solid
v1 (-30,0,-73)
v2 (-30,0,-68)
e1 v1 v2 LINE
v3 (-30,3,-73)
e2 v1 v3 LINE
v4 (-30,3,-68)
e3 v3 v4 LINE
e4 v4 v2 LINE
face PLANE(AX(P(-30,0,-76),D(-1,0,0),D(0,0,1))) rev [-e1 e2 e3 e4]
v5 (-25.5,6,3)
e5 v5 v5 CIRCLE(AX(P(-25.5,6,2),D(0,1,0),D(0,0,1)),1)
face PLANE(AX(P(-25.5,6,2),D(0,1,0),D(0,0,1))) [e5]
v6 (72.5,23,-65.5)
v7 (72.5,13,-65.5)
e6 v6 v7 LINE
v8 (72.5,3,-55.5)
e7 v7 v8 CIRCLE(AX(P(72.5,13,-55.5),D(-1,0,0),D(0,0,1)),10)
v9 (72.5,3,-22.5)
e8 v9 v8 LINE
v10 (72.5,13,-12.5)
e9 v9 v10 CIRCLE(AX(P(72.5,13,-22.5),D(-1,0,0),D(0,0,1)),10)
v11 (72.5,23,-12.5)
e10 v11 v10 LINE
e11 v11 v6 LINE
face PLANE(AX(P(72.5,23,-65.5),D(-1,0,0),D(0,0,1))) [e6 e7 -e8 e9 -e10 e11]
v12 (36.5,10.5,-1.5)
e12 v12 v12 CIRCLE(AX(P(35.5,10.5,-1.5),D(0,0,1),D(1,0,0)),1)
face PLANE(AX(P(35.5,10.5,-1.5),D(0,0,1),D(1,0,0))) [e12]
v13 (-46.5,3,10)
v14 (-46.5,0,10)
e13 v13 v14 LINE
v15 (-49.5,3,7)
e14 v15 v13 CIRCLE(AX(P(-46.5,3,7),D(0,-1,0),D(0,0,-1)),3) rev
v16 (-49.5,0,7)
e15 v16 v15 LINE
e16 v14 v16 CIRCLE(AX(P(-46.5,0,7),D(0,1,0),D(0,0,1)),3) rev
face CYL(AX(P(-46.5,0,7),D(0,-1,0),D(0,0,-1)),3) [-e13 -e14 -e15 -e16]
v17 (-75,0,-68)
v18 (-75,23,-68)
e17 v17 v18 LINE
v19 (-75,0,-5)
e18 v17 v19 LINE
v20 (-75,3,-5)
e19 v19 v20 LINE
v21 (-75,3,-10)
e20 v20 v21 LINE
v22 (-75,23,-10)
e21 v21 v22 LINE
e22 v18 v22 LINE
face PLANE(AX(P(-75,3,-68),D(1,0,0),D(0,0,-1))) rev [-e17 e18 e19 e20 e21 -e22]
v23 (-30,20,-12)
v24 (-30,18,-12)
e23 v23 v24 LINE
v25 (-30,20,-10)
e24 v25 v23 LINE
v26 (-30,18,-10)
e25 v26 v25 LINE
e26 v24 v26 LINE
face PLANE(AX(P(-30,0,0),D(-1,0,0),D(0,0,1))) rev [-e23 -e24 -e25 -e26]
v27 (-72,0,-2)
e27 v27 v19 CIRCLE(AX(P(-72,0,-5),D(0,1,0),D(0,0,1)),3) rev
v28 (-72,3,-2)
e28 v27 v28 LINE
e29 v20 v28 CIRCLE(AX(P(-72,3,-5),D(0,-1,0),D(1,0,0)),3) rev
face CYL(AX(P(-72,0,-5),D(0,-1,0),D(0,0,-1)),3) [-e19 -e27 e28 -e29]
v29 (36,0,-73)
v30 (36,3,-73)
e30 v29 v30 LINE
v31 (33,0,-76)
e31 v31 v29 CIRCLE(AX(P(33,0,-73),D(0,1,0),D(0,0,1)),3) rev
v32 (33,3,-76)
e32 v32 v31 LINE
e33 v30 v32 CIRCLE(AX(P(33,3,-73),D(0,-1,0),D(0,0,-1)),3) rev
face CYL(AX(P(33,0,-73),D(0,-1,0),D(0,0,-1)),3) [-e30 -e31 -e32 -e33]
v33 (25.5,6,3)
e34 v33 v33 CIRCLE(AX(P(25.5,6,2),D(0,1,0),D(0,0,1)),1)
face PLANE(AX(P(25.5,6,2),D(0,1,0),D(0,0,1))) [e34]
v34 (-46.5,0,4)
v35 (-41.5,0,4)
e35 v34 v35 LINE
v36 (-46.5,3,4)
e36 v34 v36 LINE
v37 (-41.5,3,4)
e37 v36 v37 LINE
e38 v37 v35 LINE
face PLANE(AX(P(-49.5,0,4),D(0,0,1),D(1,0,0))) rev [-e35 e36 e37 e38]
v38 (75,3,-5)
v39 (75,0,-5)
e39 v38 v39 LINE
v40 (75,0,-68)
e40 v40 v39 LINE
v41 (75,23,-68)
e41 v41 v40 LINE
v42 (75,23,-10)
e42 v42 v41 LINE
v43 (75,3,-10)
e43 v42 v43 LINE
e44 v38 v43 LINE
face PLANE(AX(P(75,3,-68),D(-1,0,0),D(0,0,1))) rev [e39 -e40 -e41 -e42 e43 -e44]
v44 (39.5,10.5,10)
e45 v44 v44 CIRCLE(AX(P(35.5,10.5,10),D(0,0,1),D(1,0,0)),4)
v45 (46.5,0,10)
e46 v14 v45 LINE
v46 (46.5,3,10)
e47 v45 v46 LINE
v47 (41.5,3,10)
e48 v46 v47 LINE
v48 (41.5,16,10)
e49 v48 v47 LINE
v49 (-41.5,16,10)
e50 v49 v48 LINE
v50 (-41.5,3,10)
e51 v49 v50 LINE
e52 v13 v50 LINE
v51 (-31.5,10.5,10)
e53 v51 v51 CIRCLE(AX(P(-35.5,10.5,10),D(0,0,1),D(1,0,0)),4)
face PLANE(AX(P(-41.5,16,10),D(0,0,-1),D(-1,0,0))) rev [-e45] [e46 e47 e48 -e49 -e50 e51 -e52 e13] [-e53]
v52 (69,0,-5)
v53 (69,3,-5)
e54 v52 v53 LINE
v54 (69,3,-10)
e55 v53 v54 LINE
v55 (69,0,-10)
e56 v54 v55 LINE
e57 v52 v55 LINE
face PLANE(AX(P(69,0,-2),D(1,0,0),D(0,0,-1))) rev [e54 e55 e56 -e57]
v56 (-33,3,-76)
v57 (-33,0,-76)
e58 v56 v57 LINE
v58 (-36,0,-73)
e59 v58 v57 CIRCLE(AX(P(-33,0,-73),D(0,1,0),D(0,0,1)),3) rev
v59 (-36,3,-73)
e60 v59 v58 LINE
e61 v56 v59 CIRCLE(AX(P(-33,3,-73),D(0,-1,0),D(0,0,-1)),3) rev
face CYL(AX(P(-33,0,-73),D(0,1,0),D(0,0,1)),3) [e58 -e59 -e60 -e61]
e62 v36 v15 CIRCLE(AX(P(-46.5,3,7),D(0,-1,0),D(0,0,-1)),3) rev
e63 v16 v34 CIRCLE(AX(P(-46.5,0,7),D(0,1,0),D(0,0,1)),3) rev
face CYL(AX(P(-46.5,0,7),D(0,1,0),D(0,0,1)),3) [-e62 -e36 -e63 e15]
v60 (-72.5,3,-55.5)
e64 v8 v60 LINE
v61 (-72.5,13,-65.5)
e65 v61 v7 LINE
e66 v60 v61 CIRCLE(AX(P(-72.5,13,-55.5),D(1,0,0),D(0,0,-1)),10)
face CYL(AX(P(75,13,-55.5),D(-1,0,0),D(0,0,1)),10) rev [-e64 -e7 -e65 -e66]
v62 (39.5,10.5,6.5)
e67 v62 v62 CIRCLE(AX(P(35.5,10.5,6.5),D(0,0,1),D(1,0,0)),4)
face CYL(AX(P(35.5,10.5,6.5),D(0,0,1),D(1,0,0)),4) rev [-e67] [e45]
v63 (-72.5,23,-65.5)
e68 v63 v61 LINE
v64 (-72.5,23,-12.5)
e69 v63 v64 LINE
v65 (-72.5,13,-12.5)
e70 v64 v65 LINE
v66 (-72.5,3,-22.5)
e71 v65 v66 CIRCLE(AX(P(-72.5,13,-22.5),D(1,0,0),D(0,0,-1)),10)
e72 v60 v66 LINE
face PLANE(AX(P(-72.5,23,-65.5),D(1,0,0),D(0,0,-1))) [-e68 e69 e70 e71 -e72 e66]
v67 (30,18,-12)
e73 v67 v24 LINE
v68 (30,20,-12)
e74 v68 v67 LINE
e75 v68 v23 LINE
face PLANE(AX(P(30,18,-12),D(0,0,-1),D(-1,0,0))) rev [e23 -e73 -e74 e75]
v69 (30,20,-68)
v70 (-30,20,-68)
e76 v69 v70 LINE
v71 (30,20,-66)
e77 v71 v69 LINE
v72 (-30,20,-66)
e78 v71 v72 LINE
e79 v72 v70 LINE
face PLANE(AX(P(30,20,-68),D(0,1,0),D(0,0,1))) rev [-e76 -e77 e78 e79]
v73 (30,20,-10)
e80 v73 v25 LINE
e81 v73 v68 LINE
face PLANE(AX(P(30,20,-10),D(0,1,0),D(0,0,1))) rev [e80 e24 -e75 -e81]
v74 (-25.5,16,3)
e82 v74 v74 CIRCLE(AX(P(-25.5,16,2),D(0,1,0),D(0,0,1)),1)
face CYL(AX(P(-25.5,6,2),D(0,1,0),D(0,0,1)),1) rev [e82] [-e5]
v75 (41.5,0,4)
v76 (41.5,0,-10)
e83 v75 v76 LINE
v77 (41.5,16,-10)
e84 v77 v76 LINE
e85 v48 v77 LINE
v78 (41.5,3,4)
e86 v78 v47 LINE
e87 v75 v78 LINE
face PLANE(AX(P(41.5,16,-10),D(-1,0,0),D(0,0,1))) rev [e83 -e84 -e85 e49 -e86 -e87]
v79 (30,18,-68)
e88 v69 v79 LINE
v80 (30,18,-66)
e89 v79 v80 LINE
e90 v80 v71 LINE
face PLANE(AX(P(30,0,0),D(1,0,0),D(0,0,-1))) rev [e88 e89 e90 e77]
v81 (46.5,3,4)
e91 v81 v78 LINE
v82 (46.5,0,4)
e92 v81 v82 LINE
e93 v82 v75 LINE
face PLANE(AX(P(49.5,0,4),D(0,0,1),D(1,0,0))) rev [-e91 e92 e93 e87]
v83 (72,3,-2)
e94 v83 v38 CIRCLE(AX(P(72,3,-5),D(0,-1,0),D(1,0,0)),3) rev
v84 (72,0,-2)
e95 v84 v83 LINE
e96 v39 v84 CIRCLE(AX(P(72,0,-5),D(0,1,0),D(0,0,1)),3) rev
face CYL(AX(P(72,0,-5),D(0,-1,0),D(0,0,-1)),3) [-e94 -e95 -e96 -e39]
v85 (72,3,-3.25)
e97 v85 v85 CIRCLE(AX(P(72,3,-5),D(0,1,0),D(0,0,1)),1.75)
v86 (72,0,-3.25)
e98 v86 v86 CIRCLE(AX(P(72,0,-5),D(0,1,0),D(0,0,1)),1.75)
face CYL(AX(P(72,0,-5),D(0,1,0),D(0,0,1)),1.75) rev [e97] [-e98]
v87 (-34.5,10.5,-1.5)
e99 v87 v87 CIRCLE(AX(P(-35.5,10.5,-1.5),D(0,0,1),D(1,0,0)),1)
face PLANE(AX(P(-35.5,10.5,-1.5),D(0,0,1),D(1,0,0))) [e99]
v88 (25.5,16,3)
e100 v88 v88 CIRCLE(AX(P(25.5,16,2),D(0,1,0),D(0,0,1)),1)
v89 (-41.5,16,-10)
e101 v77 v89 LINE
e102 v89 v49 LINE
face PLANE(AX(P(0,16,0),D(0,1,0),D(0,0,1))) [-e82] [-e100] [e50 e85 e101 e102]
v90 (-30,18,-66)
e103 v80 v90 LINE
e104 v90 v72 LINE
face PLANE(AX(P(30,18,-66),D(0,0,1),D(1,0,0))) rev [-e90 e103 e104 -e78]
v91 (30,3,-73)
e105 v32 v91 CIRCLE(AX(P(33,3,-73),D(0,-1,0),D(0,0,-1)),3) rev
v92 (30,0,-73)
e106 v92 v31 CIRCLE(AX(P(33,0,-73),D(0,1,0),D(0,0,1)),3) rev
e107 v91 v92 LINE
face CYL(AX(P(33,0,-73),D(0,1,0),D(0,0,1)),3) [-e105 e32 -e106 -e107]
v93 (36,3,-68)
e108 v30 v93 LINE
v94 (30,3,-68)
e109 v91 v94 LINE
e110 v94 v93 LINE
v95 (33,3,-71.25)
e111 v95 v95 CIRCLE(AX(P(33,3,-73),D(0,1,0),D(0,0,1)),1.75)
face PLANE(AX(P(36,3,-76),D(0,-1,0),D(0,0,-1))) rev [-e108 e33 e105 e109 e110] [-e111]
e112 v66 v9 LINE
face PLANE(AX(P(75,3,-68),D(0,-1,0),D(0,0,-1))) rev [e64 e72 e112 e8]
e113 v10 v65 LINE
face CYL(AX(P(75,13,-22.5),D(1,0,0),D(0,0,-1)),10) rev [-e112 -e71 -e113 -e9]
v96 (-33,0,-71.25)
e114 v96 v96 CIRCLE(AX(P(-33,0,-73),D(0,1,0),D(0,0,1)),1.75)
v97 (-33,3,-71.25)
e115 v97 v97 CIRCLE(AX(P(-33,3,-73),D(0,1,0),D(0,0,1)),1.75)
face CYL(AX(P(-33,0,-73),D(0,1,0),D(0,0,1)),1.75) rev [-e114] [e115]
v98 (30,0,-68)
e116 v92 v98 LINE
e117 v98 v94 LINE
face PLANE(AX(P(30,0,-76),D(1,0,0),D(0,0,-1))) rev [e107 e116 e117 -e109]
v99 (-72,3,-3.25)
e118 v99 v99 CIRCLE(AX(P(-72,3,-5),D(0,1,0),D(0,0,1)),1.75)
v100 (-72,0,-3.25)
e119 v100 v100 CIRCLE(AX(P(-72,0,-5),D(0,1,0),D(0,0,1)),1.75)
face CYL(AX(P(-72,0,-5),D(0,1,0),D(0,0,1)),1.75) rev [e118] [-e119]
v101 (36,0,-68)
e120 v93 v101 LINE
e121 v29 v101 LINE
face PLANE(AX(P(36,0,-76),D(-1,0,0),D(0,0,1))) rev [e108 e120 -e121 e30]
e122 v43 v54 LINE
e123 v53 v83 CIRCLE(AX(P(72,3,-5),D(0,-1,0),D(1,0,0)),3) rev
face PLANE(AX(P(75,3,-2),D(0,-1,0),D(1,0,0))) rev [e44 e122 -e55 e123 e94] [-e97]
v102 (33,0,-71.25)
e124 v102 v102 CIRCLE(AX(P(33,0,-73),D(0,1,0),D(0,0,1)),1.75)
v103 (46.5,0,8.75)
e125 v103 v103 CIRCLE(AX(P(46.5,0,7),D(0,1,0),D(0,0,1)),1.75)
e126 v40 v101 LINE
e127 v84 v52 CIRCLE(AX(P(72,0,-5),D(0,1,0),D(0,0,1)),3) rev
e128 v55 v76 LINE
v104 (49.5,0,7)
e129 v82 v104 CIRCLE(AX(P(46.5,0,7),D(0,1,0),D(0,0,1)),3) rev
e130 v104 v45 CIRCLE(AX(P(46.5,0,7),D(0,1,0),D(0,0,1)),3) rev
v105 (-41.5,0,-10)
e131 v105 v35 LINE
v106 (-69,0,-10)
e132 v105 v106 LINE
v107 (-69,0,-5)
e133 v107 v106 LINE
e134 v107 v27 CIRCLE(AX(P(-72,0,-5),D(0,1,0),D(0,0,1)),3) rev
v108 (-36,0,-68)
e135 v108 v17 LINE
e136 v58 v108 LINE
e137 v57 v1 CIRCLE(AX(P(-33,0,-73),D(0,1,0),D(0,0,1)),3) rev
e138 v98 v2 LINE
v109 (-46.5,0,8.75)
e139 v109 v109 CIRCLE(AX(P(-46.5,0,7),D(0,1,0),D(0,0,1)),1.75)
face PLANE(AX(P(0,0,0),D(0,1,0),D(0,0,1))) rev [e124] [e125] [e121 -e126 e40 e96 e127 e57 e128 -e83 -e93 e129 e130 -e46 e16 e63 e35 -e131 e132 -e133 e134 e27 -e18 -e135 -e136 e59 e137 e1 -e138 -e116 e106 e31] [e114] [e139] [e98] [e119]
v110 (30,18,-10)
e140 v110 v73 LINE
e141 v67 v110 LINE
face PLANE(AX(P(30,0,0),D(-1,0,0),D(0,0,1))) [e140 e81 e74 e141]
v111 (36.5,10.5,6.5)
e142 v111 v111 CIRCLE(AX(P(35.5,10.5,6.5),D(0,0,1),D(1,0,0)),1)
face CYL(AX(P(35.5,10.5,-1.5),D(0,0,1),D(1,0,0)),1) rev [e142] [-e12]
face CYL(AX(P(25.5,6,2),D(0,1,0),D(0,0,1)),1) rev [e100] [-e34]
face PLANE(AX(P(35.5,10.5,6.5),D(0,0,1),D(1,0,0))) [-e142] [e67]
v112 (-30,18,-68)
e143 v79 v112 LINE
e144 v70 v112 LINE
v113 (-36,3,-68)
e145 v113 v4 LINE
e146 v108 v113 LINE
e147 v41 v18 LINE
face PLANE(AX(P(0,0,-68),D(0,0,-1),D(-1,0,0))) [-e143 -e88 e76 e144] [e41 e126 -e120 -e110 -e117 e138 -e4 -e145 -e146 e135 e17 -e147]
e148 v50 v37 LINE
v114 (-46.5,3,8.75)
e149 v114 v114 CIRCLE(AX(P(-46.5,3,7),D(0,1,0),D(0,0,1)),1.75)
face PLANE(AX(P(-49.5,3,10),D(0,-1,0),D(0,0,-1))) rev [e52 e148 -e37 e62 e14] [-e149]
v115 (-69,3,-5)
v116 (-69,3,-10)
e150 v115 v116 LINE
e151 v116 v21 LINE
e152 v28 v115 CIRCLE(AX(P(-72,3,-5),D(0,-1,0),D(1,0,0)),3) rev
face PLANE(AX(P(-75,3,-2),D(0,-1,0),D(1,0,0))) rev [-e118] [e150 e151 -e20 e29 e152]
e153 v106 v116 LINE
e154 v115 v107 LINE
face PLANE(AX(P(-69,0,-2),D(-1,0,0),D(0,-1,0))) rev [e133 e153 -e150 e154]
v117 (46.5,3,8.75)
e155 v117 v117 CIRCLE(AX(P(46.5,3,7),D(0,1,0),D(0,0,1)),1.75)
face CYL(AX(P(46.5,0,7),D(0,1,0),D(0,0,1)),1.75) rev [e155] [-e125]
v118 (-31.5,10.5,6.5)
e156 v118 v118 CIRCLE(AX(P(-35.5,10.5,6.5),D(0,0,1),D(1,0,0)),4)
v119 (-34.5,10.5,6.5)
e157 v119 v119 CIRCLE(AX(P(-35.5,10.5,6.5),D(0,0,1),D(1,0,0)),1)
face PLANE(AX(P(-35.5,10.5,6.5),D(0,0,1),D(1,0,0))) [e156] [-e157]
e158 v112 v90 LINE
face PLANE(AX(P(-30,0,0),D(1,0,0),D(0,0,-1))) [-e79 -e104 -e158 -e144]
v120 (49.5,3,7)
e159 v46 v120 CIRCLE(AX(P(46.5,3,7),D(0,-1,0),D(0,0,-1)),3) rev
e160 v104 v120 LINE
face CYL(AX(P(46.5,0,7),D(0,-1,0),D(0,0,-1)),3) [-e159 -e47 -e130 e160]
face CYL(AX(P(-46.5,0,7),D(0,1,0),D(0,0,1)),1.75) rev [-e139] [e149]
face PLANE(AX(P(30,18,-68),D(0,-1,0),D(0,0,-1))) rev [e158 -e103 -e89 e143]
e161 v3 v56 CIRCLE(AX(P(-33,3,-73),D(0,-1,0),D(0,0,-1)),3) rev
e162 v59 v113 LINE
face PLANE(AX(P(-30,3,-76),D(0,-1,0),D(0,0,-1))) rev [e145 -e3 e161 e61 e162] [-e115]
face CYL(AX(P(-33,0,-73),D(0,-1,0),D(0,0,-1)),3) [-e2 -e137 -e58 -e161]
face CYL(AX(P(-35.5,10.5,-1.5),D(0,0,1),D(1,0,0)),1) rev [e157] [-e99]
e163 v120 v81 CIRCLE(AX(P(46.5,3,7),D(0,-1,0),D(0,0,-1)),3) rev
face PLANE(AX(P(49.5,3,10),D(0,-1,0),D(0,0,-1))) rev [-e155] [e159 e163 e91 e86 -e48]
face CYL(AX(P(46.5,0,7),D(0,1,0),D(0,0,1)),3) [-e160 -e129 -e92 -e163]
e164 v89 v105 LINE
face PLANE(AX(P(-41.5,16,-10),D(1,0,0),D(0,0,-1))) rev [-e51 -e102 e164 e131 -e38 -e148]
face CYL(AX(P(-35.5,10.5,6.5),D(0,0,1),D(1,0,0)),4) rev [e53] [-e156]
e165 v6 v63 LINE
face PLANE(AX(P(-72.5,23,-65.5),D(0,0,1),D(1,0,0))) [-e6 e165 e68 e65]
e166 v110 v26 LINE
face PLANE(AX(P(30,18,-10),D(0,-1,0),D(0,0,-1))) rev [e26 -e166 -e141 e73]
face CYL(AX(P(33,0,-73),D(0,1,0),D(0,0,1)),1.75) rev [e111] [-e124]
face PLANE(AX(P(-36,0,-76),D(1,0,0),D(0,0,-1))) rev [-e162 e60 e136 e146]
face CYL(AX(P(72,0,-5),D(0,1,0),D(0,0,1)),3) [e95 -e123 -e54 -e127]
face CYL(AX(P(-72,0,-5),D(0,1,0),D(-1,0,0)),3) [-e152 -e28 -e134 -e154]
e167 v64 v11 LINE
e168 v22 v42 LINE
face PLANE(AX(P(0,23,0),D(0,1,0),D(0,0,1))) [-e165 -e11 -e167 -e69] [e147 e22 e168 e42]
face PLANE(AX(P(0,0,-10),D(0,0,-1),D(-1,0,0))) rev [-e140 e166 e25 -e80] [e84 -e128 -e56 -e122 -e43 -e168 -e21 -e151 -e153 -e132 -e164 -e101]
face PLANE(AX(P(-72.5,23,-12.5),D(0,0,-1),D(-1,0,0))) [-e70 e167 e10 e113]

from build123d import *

# Parameters (mm, degrees)
SKETCH_1_W          = 83
SKETCH_1_H          = 20
EXTRUDE_1_DEPTH     = 16
SKETCH_2_R          = 4
CUT_EXTRUDE_1_DEPTH = 3.5
SKETCH_3_R          = 1
CUT_EXTRUDE_2_DEPTH = 10
SKETCH_6_R          = 1
CUT_EXTRUDE_5_DEPTH = 8
SKETCH_7_W          = 150
SKETCH_7_H          = 3
EXTRUDE_2_DEPTH     = 58
SKETCH_8_W          = 150
SKETCH_8_H          = 58
SKETCH_8_W_2        = 145
SKETCH_8_H_2        = 53
EXTRUDE_3_DEPTH     = 20
FILLET_1_R          = 10
CUT_EXTRUDE_START   = -45
SKETCH_9_W          = 2
SKETCH_9_H          = 2
CUT_EXTRUDE_6_DEPTH = 60
SKETCH_10_W         = 6
SKETCH_10_H         = 3
EXTRUDE_4_DEPTH     = 8
SKETCH_11_W         = 6
SKETCH_11_H         = 3
EXTRUDE_5_DEPTH     = 8
SKETCH_12_W         = 6
SKETCH_12_H         = 3
EXTRUDE_6_DEPTH     = 8
SKETCH_13_W         = 6
SKETCH_13_H         = 3
EXTRUDE_7_DEPTH     = 8
FILLET_2_R          = 3
SKETCH_14_R         = 1.75
CUT_EXTRUDE_7_DEPTH = 109.632407688


with BuildPart() as part:
    # 스케치1 → 보스-돌출1 (new body)
    with BuildSketch(Plane(origin=(0, 0, 0), x_dir=(1, 0, 0), z_dir=(0, 1, 0))):
        Rectangle(SKETCH_1_W, SKETCH_1_H)
    extrude(amount=EXTRUDE_1_DEPTH)

    # 스케치2 → 컷-돌출1 (cut)
    with BuildSketch(Plane.XY.offset(10)):
        with Locations((-35.5, 10.5)):
            Circle(SKETCH_2_R)
        with Locations((35.5, 10.5)):
            Circle(SKETCH_2_R)
    extrude(amount=-CUT_EXTRUDE_1_DEPTH, mode=Mode.SUBTRACT)

    # 스케치3 → 컷-돌출2 (cut)
    with BuildSketch(Plane(origin=(0, 16, 0), x_dir=(1, 0, 0), z_dir=(0, 1, 0))):
        with Locations(Location((-25.5, -2, 0), (0, 0, 270))):
            Circle(SKETCH_3_R)
        with Locations(Location((25.5, -2, 0), (0, 0, 270))):
            Circle(SKETCH_3_R)
    extrude(amount=-CUT_EXTRUDE_2_DEPTH, mode=Mode.SUBTRACT)

    # 스케치6 → 컷-돌출5 (cut)
    with BuildSketch(Plane.XY.offset(6.5)):
        with Locations((-35.5, 10.5)):
            Circle(SKETCH_6_R)
        with Locations((35.5, 10.5)):
            Circle(SKETCH_6_R)
    extrude(amount=-CUT_EXTRUDE_5_DEPTH, mode=Mode.SUBTRACT)

    # 스케치7 → 보스-돌출2 (add)
    with BuildSketch(Plane(origin=(0, 0, -10), x_dir=(-1, 0, 0), z_dir=(0, 0, -1))):
        with Locations((0, 1.5)):
            Rectangle(SKETCH_7_W, SKETCH_7_H)
    extrude(amount=EXTRUDE_2_DEPTH)

    # 스케치8 → 보스-돌출3 (add)
    with BuildSketch(Plane(origin=(0, 3, 0), x_dir=(1, 0, 0), z_dir=(0, 1, 0))):
        with Locations((0, 39)):
            Rectangle(SKETCH_8_W, SKETCH_8_H)
        with Locations((0, 39)):
            Rectangle(SKETCH_8_W_2, SKETCH_8_H_2, mode=Mode.SUBTRACT)
    extrude(amount=EXTRUDE_3_DEPTH)

    # 필렛1
    fillet_1_edges = [part.edges().sort_by_distance(p)[0] for p in [
        (0, 3, -65.5),
        (0, 3, -12.5),
    ]]
    fillet(fillet_1_edges, radius=FILLET_1_R)

    # 스케치9 → 컷-돌출6 (cut)
    with BuildSketch(Plane.ZY.offset(75).offset(CUT_EXTRUDE_START)):
        with Locations((-67, 19)):
            Rectangle(SKETCH_9_W, SKETCH_9_H)
        with Locations((-11, 19)):
            Rectangle(SKETCH_9_W, SKETCH_9_H)
    extrude(amount=-CUT_EXTRUDE_6_DEPTH, mode=Mode.SUBTRACT)

    # 스케치10 → 보스-돌출4 (add)
    with BuildSketch(Plane.XY.offset(-10)):
        with Locations((-72, 1.5)):
            Rectangle(SKETCH_10_W, SKETCH_10_H)
        with Locations((72, 1.5)):
            Rectangle(SKETCH_10_W, SKETCH_10_H)
    extrude(amount=EXTRUDE_4_DEPTH)

    # 스케치11 → 보스-돌출5 (add)
    with BuildSketch(Plane(origin=(0, 0, -68), x_dir=(-1, 0, 0), z_dir=(0, 0, -1))):
        with Locations((-33, 1.5)):
            Rectangle(SKETCH_11_W, SKETCH_11_H)
        with Locations((33, 1.5)):
            Rectangle(SKETCH_11_W, SKETCH_11_H)
    extrude(amount=EXTRUDE_5_DEPTH)

    # 스케치12 → 보스-돌출6 (add)
    with BuildSketch(Plane.ZY.offset(41.5)):
        with Locations((7, 1.5)):
            Rectangle(SKETCH_12_W, SKETCH_12_H)
    extrude(amount=EXTRUDE_6_DEPTH)

    # 스케치13 → 보스-돌출7 (add)
    with BuildSketch(Plane(origin=(41.5, 0, 0), x_dir=(0, 0, -1), z_dir=(1, 0, 0))):
        with Locations((-7, 1.5)):
            Rectangle(SKETCH_13_W, SKETCH_13_H)
    extrude(amount=EXTRUDE_7_DEPTH)

    # 필렛2
    fillet_2_edges = [part.edges().sort_by_distance(p)[0] for p in [
        (69, 1.5, -2),
        (75, 1.5, -2),
        (-75, 1.5, -2),
        (-69, 1.5, -2),
        (-36, 1.5, -76),
        (-30, 1.5, -76),
        (30, 1.5, -76),
        (36, 1.5, -76),
        (-49.5, 1.5, 4),
        (-49.5, 1.5, 10),
        (49.5, 1.5, 10),
        (49.5, 1.5, 4),
    ]]
    fillet(fillet_2_edges, radius=FILLET_2_R - 0.0001)  # a hair under: the kernel refuses the full size

    # 스케치14 → 컷-돌출7 (cut, through all)
    with BuildSketch(Plane(origin=(0, 3, 0), x_dir=(1, 0, 0), z_dir=(0, 1, 0))):
        with Locations(Location((-33, 73, 0), (0, 0, 270))):
            Circle(SKETCH_14_R)
        with Locations(Location((33, 73, 0), (0, 0, 270))):
            Circle(SKETCH_14_R)
        with Locations(Location((-46.5, -7, 0), (0, 0, 270))):
            Circle(SKETCH_14_R)
        with Locations(Location((46.5, -7, 0), (0, 0, 270))):
            Circle(SKETCH_14_R)
        with Locations(Location((72, 5, 0), (0, 0, 270))):
            Circle(SKETCH_14_R)
        with Locations(Location((-72, 5, 0), (0, 0, 270))):
            Circle(SKETCH_14_R)
    extrude(amount=-CUT_EXTRUDE_7_DEPTH, mode=Mode.SUBTRACT)


solid = part.part
